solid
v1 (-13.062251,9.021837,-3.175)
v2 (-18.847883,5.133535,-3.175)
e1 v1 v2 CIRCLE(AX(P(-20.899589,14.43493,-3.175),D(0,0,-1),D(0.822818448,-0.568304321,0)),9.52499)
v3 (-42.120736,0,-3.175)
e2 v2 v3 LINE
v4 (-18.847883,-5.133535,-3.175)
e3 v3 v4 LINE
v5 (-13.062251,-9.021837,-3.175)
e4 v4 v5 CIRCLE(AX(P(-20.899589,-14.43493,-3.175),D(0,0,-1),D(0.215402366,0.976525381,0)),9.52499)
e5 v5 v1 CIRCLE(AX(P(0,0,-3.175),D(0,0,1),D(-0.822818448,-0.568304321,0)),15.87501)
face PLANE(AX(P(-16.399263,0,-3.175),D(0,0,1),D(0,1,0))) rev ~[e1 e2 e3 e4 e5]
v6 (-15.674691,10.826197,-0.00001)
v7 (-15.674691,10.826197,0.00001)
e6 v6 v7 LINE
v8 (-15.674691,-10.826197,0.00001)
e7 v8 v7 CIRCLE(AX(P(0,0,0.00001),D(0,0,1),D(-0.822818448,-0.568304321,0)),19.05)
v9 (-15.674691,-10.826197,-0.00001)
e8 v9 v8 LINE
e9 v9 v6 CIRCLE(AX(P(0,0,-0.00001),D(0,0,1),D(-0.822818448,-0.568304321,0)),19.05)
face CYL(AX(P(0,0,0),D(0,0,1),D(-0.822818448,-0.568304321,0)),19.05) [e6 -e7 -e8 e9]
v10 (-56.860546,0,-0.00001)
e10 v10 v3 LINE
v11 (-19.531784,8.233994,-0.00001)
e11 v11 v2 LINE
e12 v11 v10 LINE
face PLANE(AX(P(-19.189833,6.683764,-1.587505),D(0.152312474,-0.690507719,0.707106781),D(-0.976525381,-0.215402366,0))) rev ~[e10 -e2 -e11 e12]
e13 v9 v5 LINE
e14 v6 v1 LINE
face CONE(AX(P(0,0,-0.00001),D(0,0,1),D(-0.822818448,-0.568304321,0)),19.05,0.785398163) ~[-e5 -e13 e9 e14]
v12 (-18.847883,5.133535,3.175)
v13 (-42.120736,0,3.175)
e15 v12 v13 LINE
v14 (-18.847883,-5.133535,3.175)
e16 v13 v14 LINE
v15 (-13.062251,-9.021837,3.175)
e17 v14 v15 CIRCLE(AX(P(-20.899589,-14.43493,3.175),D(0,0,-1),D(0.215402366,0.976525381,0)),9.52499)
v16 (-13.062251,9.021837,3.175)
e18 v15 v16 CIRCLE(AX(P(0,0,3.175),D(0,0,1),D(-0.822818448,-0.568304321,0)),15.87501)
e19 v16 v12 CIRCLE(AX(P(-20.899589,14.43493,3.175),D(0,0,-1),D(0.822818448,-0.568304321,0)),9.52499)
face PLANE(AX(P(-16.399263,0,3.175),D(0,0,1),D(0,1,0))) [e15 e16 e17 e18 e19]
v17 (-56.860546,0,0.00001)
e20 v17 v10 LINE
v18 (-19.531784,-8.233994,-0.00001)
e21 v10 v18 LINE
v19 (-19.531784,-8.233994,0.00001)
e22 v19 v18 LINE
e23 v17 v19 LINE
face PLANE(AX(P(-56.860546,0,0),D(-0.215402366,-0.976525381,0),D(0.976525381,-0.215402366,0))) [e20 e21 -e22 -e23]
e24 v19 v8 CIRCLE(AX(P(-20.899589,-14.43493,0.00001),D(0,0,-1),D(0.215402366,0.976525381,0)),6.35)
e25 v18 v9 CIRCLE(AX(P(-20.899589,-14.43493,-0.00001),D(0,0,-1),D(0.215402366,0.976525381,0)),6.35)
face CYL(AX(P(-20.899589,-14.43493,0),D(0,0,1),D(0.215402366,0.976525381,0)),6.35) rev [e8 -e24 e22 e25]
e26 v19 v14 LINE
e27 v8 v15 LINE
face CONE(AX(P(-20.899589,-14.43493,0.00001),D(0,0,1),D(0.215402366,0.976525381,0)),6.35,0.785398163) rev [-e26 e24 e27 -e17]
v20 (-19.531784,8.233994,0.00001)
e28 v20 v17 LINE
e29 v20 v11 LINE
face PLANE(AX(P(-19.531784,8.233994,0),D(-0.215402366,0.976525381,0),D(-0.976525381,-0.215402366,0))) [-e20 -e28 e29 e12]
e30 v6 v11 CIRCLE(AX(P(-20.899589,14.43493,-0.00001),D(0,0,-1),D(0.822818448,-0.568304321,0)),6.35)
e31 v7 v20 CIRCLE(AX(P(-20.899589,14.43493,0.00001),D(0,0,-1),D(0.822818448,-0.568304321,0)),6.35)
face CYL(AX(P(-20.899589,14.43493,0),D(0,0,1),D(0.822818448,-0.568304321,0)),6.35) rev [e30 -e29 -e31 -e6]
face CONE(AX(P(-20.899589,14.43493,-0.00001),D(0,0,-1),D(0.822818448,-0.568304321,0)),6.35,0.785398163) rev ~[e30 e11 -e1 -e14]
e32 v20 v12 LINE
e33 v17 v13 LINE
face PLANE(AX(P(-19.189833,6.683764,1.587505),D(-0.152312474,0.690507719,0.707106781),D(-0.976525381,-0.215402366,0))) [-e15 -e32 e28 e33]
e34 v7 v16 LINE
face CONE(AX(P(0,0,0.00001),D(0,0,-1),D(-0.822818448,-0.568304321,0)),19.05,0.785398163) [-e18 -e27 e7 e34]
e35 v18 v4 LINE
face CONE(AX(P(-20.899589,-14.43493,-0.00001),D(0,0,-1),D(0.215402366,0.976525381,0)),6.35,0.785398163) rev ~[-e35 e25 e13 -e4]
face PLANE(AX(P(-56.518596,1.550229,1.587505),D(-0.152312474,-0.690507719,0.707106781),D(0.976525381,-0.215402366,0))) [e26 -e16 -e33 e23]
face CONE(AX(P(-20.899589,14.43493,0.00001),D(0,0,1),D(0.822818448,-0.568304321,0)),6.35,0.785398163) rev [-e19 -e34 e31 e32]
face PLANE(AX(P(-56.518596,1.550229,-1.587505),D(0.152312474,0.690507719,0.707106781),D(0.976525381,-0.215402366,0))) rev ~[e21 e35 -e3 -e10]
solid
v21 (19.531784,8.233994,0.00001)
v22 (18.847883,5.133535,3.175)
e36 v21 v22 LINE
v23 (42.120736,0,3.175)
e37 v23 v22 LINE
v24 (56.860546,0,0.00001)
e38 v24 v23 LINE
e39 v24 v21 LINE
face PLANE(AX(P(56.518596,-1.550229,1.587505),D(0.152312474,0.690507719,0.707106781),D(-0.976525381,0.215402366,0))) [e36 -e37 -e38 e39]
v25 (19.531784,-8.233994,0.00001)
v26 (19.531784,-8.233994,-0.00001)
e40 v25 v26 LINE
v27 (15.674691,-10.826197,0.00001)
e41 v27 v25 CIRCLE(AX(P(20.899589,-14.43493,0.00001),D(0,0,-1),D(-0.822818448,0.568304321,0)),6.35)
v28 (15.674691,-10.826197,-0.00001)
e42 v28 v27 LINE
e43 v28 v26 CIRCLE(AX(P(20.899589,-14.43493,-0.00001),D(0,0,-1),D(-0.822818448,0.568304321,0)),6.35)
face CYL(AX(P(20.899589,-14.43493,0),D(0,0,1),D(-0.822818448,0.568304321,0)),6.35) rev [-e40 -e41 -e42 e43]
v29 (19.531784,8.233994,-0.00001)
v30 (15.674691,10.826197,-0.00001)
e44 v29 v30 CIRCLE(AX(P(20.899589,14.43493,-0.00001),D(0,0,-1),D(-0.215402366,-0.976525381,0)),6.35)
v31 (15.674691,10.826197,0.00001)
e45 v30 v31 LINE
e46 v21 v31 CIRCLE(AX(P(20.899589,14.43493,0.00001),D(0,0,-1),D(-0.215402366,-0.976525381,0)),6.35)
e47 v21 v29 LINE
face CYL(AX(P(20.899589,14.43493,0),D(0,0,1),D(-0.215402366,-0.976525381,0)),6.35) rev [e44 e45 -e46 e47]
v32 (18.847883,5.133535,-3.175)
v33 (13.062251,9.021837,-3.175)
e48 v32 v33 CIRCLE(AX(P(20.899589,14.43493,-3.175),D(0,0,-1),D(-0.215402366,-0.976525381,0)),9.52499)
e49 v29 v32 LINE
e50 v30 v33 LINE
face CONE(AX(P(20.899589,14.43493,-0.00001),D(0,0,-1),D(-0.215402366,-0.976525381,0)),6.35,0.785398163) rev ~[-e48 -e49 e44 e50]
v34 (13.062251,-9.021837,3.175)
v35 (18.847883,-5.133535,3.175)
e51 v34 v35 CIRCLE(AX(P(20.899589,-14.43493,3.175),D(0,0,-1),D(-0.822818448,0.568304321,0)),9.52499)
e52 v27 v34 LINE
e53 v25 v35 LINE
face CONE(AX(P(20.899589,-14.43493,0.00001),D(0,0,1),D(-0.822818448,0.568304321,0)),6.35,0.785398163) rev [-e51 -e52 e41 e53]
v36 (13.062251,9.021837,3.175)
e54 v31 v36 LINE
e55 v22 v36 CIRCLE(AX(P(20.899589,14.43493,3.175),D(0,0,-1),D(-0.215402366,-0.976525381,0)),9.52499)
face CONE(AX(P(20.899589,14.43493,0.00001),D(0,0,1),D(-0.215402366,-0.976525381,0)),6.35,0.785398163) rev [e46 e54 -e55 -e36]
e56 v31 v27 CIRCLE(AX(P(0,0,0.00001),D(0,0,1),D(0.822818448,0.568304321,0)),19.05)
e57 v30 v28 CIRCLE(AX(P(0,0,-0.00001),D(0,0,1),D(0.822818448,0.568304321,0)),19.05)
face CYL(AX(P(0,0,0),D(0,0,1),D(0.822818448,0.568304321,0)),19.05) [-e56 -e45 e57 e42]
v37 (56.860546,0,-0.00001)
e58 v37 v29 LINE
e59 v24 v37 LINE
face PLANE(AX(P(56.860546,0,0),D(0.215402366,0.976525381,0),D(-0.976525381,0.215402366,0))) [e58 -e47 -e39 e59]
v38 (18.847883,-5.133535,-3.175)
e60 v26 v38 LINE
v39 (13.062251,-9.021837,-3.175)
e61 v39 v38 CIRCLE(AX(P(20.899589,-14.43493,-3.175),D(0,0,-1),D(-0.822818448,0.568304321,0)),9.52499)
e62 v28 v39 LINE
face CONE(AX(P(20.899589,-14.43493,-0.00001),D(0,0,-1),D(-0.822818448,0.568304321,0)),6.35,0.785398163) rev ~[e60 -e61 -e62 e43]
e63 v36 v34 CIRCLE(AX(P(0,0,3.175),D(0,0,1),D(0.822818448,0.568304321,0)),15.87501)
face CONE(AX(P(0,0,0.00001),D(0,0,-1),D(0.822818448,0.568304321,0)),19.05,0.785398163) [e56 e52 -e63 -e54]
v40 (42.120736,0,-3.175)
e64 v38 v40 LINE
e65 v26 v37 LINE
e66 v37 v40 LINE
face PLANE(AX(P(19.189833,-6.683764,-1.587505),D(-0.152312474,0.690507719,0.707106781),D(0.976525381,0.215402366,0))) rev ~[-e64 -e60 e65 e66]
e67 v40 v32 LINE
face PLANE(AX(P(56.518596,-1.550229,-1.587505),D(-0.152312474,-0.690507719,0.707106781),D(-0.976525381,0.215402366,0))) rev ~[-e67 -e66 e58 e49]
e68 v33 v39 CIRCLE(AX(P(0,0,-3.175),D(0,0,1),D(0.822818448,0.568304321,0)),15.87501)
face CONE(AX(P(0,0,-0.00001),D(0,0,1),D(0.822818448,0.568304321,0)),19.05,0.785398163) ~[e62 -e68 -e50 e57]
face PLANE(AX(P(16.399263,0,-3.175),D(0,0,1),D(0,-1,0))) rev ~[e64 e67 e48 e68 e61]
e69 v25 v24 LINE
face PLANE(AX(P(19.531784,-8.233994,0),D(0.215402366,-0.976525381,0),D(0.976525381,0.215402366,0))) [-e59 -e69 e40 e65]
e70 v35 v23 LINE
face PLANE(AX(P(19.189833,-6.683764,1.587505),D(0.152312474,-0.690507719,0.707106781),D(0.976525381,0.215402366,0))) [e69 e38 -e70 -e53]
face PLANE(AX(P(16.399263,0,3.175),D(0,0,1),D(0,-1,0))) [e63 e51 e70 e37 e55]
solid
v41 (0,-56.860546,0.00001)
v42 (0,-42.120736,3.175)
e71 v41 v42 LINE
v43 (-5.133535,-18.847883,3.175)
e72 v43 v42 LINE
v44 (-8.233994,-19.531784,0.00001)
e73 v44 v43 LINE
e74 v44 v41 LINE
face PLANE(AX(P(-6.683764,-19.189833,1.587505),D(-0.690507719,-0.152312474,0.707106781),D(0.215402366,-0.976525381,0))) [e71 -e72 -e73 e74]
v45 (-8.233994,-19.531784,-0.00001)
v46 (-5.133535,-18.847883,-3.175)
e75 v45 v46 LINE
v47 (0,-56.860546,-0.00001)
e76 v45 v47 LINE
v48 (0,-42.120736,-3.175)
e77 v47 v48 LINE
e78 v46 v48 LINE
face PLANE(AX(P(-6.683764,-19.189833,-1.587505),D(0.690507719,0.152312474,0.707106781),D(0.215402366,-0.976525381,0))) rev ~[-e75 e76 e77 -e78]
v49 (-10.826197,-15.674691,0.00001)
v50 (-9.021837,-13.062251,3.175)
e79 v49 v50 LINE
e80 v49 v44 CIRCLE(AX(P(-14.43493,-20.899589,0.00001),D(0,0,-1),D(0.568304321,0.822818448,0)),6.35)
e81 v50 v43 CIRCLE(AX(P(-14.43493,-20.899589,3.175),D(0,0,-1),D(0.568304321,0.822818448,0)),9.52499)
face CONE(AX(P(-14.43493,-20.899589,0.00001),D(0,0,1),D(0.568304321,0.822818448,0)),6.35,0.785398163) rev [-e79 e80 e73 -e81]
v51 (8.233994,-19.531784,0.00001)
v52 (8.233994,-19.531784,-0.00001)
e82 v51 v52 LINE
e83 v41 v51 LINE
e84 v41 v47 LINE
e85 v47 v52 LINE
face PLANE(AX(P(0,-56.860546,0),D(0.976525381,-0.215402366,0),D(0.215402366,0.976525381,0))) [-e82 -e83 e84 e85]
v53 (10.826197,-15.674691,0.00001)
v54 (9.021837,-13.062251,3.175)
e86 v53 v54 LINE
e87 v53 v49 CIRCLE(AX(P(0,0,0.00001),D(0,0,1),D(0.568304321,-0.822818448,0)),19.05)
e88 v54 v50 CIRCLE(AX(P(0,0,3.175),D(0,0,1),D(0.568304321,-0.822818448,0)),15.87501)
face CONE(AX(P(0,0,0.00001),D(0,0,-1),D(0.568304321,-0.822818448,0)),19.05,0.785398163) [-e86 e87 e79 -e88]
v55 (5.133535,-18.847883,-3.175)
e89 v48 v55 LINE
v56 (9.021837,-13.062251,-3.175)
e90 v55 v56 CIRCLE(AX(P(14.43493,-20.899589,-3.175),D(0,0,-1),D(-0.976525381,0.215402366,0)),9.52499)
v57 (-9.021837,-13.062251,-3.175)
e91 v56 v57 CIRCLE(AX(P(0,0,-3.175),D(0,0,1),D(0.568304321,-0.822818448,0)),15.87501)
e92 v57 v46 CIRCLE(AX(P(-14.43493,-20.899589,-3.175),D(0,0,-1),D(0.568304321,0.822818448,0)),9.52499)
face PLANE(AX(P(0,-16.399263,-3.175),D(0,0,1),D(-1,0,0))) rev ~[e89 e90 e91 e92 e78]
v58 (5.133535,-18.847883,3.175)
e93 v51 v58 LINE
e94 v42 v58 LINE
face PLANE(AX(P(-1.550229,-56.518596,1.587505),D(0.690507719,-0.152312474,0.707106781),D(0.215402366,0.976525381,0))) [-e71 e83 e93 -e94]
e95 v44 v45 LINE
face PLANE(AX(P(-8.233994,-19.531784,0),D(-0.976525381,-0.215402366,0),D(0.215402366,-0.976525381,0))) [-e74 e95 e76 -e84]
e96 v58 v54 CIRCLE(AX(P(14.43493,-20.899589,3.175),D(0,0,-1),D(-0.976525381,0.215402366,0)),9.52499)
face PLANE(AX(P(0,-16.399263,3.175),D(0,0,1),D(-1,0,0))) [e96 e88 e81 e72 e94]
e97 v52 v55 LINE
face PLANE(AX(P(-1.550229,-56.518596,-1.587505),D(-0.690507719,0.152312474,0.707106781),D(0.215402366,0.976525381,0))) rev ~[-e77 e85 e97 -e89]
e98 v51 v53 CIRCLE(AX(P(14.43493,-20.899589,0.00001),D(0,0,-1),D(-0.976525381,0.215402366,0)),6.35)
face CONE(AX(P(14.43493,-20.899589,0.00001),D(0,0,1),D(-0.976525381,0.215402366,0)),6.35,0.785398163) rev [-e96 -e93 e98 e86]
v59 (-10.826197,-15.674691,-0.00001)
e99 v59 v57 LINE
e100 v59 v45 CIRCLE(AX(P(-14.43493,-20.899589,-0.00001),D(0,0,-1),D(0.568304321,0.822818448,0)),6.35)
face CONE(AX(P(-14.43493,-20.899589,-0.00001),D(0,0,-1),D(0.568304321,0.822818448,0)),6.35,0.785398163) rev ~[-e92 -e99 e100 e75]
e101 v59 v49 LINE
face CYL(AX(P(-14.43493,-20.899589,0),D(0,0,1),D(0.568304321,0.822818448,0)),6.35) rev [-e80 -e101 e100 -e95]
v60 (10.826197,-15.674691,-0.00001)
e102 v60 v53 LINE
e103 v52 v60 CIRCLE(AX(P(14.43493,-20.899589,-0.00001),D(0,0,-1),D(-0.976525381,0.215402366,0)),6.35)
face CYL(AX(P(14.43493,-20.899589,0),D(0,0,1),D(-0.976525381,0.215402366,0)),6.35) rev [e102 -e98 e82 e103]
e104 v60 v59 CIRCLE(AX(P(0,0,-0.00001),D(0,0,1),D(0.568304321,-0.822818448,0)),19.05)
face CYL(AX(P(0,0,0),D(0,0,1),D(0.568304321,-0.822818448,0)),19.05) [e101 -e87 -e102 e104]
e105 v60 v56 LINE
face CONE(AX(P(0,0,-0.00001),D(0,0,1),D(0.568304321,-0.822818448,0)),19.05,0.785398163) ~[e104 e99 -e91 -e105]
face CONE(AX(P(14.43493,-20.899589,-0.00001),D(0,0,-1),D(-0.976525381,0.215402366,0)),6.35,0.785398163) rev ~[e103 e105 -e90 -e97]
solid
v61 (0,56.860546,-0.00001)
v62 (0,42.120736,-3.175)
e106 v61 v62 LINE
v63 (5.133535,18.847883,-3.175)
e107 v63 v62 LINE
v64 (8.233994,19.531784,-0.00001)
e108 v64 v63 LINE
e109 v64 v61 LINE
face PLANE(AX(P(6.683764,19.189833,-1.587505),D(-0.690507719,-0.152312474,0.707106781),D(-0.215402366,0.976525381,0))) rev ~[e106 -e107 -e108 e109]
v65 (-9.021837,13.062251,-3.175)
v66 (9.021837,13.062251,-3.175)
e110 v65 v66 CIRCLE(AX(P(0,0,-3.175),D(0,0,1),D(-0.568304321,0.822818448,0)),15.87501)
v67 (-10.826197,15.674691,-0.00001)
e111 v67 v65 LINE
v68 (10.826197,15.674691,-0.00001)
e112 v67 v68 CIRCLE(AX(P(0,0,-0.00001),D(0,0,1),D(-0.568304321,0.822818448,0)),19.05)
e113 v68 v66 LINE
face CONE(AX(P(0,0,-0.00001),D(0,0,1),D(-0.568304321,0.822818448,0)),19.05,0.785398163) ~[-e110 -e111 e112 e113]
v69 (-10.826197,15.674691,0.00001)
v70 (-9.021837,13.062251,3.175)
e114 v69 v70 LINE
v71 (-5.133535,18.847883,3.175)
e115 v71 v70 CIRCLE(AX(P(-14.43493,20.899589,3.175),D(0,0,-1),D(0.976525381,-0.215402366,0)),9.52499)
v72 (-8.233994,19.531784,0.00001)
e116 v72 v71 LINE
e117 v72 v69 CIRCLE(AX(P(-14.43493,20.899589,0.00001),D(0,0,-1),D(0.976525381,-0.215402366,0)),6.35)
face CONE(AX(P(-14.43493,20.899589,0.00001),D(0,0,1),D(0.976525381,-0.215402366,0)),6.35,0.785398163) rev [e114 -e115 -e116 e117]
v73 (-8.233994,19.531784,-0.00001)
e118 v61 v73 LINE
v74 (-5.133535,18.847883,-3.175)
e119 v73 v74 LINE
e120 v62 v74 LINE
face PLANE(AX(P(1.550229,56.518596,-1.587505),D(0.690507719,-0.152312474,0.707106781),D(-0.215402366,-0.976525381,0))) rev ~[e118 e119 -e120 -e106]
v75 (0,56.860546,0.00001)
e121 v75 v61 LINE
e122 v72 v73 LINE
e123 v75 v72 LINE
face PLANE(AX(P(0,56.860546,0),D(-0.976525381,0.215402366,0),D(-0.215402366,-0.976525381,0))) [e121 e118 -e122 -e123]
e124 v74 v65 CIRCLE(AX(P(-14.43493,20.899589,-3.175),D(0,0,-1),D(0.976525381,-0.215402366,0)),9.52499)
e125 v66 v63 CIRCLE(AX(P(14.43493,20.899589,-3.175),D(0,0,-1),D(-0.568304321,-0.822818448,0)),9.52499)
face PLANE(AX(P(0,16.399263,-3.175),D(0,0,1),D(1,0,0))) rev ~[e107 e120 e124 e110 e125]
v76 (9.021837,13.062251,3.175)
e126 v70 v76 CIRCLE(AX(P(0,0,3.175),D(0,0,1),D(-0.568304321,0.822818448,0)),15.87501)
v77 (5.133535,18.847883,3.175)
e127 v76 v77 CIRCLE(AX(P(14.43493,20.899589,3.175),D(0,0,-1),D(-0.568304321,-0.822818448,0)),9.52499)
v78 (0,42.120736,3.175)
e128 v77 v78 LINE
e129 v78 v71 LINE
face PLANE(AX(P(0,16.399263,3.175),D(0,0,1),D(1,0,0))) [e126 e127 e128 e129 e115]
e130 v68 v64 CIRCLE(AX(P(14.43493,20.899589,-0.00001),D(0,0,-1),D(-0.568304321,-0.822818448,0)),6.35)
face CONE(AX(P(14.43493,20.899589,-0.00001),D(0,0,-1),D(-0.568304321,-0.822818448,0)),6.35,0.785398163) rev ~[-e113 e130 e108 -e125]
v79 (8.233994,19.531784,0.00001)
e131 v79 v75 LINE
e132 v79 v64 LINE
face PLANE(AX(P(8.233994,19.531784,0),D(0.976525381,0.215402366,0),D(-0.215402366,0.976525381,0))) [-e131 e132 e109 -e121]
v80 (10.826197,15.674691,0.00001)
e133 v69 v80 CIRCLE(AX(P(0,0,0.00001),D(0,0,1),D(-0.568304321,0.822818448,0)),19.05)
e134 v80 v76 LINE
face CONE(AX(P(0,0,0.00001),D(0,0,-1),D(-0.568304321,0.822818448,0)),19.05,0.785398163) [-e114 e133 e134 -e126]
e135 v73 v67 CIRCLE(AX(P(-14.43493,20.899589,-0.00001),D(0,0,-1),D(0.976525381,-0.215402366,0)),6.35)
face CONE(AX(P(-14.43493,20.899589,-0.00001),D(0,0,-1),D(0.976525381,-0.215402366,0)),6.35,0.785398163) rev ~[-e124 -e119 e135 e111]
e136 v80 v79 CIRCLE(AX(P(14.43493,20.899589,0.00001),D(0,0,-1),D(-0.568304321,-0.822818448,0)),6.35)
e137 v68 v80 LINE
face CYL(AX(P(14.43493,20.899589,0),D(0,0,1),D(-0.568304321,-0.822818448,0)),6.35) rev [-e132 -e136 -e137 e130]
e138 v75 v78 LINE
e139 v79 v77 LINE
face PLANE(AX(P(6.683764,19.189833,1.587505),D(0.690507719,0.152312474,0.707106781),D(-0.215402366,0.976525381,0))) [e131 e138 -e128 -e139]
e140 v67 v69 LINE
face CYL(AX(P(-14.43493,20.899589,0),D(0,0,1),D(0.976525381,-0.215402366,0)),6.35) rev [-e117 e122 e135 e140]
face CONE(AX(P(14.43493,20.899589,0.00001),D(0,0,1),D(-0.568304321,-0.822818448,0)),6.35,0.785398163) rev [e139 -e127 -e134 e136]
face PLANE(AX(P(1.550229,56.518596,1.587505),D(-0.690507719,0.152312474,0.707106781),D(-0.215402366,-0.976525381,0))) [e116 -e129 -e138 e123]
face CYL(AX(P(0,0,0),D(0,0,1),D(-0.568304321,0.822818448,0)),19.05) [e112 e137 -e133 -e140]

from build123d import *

# Parameters (mm, degrees)
F1_DEPTH  = 3.175
F2_COUNT  = 4
F3_SIZE   = 3.17499
F3_2_SIZE = 3.17499
F3_3_SIZE = 3.17499
F3_4_SIZE = 3.17499


# Not quite as in the source:
# - a fillet or chamfer is up to 0.001 mm smaller than in the source, because OpenCascade refuses the exact size


with BuildPart() as f1:
    # F0 (on Top) → F1 (new body, symmetric)
    with BuildSketch(Plane.XY):
        with BuildLine():
            ThreePointArc((-8.2339935894, 19.5317835541), (-9.164570241, 17.3575820119), (-10.8261973213, 15.6746914343))
            ThreePointArc((-10.8261973213, 15.6746914343), (0, -19.05), (10.8261973213, 15.6746914343))
            ThreePointArc((10.8261973213, 15.6746914343), (9.164570241, 17.3575820119), (8.2339935894, 19.5317835541))
            Line((8.2339935894, 19.5317835541), (0, 56.8605458856))
            Line((0, 56.8605458856), (-8.2339935894, 19.5317835541))
        make_face()
    extrude(amount=F1_DEPTH, both=True)


with BuildPart() as f2_1:
    # F2: instance of F1
    add(f1.part.rotate(Axis((0, 0, 0), (0, 0, 1)), 1 * 360 / F2_COUNT))

    # F3 (size 3.175 in the source; OpenCascade refuses exactly that, so slightly less here)
    f3_edges = [f2_1.edges().sort_by_distance(p)[0] for p in [
        (-38.196165, 4.116997, 3.175),
        (-38.196165, -4.116997, 3.175),
        (-17.357582, -9.16457, 3.175),
        (19.05, 0, 3.175),
        (-17.357582, 9.16457, 3.175),
        (-38.196165, 4.116997, -3.175),
        (-38.196165, -4.116997, -3.175),
        (-17.357582, -9.16457, -3.175),
        (19.05, 0, -3.175),
        (-17.357582, 9.16457, -3.175),
    ]]
    chamfer(f3_edges, length=F3_SIZE)


with BuildPart() as f2_2:
    # F2: instance of F1
    add(f1.part.rotate(Axis((0, 0, 0), (0, 0, 1)), 2 * 360 / F2_COUNT))

    # F3#4 (size 3.175 in the source; OpenCascade refuses exactly that, so slightly less here)
    f3_4_edges = [f2_2.edges().sort_by_distance(p)[0] for p in [
        (-4.116997, -38.196165, 3.175),
        (4.116997, -38.196165, 3.175),
        (9.16457, -17.357582, 3.175),
        (0, 19.05, 3.175),
        (-9.16457, -17.357582, 3.175),
        (-4.116997, -38.196165, -3.175),
        (4.116997, -38.196165, -3.175),
        (9.16457, -17.357582, -3.175),
        (0, 19.05, -3.175),
        (-9.16457, -17.357582, -3.175),
    ]]
    chamfer(f3_4_edges, length=F3_4_SIZE)


with BuildPart() as f2_3:
    # F2: instance of F1
    add(f1.part.rotate(Axis((0, 0, 0), (0, 0, 1)), 3 * 360 / F2_COUNT))

    # F3#3 (size 3.175 in the source; OpenCascade refuses exactly that, so slightly less here)
    f3_3_edges = [f2_3.edges().sort_by_distance(p)[0] for p in [
        (38.196165, -4.116997, 3.175),
        (38.196165, 4.116997, 3.175),
        (17.357582, 9.16457, 3.175),
        (-19.05, 0, 3.175),
        (17.357582, -9.16457, 3.175),
        (38.196165, -4.116997, -3.175),
        (38.196165, 4.116997, -3.175),
        (17.357582, 9.16457, -3.175),
        (-19.05, 0, -3.175),
        (17.357582, -9.16457, -3.175),
    ]]
    chamfer(f3_3_edges, length=F3_3_SIZE)


with BuildPart() as f1_1:
    add(f1.part)

    # F3#2 (size 3.175 in the source; OpenCascade refuses exactly that, so slightly less here)
    f3_2_edges = [f1_1.edges().sort_by_distance(p)[0] for p in [
        (4.116997, 38.196165, 3.175),
        (-4.116997, 38.196165, 3.175),
        (-9.16457, 17.357582, 3.175),
        (0, -19.05, 3.175),
        (9.16457, 17.357582, 3.175),
        (4.116997, 38.196165, -3.175),
        (-4.116997, 38.196165, -3.175),
        (-9.16457, 17.357582, -3.175),
        (0, -19.05, -3.175),
        (9.16457, 17.357582, -3.175),
    ]]
    chamfer(f3_2_edges, length=F3_2_SIZE)


solid = Compound([f2_1.part, f2_2.part, f2_3.part, f1_1.part])
